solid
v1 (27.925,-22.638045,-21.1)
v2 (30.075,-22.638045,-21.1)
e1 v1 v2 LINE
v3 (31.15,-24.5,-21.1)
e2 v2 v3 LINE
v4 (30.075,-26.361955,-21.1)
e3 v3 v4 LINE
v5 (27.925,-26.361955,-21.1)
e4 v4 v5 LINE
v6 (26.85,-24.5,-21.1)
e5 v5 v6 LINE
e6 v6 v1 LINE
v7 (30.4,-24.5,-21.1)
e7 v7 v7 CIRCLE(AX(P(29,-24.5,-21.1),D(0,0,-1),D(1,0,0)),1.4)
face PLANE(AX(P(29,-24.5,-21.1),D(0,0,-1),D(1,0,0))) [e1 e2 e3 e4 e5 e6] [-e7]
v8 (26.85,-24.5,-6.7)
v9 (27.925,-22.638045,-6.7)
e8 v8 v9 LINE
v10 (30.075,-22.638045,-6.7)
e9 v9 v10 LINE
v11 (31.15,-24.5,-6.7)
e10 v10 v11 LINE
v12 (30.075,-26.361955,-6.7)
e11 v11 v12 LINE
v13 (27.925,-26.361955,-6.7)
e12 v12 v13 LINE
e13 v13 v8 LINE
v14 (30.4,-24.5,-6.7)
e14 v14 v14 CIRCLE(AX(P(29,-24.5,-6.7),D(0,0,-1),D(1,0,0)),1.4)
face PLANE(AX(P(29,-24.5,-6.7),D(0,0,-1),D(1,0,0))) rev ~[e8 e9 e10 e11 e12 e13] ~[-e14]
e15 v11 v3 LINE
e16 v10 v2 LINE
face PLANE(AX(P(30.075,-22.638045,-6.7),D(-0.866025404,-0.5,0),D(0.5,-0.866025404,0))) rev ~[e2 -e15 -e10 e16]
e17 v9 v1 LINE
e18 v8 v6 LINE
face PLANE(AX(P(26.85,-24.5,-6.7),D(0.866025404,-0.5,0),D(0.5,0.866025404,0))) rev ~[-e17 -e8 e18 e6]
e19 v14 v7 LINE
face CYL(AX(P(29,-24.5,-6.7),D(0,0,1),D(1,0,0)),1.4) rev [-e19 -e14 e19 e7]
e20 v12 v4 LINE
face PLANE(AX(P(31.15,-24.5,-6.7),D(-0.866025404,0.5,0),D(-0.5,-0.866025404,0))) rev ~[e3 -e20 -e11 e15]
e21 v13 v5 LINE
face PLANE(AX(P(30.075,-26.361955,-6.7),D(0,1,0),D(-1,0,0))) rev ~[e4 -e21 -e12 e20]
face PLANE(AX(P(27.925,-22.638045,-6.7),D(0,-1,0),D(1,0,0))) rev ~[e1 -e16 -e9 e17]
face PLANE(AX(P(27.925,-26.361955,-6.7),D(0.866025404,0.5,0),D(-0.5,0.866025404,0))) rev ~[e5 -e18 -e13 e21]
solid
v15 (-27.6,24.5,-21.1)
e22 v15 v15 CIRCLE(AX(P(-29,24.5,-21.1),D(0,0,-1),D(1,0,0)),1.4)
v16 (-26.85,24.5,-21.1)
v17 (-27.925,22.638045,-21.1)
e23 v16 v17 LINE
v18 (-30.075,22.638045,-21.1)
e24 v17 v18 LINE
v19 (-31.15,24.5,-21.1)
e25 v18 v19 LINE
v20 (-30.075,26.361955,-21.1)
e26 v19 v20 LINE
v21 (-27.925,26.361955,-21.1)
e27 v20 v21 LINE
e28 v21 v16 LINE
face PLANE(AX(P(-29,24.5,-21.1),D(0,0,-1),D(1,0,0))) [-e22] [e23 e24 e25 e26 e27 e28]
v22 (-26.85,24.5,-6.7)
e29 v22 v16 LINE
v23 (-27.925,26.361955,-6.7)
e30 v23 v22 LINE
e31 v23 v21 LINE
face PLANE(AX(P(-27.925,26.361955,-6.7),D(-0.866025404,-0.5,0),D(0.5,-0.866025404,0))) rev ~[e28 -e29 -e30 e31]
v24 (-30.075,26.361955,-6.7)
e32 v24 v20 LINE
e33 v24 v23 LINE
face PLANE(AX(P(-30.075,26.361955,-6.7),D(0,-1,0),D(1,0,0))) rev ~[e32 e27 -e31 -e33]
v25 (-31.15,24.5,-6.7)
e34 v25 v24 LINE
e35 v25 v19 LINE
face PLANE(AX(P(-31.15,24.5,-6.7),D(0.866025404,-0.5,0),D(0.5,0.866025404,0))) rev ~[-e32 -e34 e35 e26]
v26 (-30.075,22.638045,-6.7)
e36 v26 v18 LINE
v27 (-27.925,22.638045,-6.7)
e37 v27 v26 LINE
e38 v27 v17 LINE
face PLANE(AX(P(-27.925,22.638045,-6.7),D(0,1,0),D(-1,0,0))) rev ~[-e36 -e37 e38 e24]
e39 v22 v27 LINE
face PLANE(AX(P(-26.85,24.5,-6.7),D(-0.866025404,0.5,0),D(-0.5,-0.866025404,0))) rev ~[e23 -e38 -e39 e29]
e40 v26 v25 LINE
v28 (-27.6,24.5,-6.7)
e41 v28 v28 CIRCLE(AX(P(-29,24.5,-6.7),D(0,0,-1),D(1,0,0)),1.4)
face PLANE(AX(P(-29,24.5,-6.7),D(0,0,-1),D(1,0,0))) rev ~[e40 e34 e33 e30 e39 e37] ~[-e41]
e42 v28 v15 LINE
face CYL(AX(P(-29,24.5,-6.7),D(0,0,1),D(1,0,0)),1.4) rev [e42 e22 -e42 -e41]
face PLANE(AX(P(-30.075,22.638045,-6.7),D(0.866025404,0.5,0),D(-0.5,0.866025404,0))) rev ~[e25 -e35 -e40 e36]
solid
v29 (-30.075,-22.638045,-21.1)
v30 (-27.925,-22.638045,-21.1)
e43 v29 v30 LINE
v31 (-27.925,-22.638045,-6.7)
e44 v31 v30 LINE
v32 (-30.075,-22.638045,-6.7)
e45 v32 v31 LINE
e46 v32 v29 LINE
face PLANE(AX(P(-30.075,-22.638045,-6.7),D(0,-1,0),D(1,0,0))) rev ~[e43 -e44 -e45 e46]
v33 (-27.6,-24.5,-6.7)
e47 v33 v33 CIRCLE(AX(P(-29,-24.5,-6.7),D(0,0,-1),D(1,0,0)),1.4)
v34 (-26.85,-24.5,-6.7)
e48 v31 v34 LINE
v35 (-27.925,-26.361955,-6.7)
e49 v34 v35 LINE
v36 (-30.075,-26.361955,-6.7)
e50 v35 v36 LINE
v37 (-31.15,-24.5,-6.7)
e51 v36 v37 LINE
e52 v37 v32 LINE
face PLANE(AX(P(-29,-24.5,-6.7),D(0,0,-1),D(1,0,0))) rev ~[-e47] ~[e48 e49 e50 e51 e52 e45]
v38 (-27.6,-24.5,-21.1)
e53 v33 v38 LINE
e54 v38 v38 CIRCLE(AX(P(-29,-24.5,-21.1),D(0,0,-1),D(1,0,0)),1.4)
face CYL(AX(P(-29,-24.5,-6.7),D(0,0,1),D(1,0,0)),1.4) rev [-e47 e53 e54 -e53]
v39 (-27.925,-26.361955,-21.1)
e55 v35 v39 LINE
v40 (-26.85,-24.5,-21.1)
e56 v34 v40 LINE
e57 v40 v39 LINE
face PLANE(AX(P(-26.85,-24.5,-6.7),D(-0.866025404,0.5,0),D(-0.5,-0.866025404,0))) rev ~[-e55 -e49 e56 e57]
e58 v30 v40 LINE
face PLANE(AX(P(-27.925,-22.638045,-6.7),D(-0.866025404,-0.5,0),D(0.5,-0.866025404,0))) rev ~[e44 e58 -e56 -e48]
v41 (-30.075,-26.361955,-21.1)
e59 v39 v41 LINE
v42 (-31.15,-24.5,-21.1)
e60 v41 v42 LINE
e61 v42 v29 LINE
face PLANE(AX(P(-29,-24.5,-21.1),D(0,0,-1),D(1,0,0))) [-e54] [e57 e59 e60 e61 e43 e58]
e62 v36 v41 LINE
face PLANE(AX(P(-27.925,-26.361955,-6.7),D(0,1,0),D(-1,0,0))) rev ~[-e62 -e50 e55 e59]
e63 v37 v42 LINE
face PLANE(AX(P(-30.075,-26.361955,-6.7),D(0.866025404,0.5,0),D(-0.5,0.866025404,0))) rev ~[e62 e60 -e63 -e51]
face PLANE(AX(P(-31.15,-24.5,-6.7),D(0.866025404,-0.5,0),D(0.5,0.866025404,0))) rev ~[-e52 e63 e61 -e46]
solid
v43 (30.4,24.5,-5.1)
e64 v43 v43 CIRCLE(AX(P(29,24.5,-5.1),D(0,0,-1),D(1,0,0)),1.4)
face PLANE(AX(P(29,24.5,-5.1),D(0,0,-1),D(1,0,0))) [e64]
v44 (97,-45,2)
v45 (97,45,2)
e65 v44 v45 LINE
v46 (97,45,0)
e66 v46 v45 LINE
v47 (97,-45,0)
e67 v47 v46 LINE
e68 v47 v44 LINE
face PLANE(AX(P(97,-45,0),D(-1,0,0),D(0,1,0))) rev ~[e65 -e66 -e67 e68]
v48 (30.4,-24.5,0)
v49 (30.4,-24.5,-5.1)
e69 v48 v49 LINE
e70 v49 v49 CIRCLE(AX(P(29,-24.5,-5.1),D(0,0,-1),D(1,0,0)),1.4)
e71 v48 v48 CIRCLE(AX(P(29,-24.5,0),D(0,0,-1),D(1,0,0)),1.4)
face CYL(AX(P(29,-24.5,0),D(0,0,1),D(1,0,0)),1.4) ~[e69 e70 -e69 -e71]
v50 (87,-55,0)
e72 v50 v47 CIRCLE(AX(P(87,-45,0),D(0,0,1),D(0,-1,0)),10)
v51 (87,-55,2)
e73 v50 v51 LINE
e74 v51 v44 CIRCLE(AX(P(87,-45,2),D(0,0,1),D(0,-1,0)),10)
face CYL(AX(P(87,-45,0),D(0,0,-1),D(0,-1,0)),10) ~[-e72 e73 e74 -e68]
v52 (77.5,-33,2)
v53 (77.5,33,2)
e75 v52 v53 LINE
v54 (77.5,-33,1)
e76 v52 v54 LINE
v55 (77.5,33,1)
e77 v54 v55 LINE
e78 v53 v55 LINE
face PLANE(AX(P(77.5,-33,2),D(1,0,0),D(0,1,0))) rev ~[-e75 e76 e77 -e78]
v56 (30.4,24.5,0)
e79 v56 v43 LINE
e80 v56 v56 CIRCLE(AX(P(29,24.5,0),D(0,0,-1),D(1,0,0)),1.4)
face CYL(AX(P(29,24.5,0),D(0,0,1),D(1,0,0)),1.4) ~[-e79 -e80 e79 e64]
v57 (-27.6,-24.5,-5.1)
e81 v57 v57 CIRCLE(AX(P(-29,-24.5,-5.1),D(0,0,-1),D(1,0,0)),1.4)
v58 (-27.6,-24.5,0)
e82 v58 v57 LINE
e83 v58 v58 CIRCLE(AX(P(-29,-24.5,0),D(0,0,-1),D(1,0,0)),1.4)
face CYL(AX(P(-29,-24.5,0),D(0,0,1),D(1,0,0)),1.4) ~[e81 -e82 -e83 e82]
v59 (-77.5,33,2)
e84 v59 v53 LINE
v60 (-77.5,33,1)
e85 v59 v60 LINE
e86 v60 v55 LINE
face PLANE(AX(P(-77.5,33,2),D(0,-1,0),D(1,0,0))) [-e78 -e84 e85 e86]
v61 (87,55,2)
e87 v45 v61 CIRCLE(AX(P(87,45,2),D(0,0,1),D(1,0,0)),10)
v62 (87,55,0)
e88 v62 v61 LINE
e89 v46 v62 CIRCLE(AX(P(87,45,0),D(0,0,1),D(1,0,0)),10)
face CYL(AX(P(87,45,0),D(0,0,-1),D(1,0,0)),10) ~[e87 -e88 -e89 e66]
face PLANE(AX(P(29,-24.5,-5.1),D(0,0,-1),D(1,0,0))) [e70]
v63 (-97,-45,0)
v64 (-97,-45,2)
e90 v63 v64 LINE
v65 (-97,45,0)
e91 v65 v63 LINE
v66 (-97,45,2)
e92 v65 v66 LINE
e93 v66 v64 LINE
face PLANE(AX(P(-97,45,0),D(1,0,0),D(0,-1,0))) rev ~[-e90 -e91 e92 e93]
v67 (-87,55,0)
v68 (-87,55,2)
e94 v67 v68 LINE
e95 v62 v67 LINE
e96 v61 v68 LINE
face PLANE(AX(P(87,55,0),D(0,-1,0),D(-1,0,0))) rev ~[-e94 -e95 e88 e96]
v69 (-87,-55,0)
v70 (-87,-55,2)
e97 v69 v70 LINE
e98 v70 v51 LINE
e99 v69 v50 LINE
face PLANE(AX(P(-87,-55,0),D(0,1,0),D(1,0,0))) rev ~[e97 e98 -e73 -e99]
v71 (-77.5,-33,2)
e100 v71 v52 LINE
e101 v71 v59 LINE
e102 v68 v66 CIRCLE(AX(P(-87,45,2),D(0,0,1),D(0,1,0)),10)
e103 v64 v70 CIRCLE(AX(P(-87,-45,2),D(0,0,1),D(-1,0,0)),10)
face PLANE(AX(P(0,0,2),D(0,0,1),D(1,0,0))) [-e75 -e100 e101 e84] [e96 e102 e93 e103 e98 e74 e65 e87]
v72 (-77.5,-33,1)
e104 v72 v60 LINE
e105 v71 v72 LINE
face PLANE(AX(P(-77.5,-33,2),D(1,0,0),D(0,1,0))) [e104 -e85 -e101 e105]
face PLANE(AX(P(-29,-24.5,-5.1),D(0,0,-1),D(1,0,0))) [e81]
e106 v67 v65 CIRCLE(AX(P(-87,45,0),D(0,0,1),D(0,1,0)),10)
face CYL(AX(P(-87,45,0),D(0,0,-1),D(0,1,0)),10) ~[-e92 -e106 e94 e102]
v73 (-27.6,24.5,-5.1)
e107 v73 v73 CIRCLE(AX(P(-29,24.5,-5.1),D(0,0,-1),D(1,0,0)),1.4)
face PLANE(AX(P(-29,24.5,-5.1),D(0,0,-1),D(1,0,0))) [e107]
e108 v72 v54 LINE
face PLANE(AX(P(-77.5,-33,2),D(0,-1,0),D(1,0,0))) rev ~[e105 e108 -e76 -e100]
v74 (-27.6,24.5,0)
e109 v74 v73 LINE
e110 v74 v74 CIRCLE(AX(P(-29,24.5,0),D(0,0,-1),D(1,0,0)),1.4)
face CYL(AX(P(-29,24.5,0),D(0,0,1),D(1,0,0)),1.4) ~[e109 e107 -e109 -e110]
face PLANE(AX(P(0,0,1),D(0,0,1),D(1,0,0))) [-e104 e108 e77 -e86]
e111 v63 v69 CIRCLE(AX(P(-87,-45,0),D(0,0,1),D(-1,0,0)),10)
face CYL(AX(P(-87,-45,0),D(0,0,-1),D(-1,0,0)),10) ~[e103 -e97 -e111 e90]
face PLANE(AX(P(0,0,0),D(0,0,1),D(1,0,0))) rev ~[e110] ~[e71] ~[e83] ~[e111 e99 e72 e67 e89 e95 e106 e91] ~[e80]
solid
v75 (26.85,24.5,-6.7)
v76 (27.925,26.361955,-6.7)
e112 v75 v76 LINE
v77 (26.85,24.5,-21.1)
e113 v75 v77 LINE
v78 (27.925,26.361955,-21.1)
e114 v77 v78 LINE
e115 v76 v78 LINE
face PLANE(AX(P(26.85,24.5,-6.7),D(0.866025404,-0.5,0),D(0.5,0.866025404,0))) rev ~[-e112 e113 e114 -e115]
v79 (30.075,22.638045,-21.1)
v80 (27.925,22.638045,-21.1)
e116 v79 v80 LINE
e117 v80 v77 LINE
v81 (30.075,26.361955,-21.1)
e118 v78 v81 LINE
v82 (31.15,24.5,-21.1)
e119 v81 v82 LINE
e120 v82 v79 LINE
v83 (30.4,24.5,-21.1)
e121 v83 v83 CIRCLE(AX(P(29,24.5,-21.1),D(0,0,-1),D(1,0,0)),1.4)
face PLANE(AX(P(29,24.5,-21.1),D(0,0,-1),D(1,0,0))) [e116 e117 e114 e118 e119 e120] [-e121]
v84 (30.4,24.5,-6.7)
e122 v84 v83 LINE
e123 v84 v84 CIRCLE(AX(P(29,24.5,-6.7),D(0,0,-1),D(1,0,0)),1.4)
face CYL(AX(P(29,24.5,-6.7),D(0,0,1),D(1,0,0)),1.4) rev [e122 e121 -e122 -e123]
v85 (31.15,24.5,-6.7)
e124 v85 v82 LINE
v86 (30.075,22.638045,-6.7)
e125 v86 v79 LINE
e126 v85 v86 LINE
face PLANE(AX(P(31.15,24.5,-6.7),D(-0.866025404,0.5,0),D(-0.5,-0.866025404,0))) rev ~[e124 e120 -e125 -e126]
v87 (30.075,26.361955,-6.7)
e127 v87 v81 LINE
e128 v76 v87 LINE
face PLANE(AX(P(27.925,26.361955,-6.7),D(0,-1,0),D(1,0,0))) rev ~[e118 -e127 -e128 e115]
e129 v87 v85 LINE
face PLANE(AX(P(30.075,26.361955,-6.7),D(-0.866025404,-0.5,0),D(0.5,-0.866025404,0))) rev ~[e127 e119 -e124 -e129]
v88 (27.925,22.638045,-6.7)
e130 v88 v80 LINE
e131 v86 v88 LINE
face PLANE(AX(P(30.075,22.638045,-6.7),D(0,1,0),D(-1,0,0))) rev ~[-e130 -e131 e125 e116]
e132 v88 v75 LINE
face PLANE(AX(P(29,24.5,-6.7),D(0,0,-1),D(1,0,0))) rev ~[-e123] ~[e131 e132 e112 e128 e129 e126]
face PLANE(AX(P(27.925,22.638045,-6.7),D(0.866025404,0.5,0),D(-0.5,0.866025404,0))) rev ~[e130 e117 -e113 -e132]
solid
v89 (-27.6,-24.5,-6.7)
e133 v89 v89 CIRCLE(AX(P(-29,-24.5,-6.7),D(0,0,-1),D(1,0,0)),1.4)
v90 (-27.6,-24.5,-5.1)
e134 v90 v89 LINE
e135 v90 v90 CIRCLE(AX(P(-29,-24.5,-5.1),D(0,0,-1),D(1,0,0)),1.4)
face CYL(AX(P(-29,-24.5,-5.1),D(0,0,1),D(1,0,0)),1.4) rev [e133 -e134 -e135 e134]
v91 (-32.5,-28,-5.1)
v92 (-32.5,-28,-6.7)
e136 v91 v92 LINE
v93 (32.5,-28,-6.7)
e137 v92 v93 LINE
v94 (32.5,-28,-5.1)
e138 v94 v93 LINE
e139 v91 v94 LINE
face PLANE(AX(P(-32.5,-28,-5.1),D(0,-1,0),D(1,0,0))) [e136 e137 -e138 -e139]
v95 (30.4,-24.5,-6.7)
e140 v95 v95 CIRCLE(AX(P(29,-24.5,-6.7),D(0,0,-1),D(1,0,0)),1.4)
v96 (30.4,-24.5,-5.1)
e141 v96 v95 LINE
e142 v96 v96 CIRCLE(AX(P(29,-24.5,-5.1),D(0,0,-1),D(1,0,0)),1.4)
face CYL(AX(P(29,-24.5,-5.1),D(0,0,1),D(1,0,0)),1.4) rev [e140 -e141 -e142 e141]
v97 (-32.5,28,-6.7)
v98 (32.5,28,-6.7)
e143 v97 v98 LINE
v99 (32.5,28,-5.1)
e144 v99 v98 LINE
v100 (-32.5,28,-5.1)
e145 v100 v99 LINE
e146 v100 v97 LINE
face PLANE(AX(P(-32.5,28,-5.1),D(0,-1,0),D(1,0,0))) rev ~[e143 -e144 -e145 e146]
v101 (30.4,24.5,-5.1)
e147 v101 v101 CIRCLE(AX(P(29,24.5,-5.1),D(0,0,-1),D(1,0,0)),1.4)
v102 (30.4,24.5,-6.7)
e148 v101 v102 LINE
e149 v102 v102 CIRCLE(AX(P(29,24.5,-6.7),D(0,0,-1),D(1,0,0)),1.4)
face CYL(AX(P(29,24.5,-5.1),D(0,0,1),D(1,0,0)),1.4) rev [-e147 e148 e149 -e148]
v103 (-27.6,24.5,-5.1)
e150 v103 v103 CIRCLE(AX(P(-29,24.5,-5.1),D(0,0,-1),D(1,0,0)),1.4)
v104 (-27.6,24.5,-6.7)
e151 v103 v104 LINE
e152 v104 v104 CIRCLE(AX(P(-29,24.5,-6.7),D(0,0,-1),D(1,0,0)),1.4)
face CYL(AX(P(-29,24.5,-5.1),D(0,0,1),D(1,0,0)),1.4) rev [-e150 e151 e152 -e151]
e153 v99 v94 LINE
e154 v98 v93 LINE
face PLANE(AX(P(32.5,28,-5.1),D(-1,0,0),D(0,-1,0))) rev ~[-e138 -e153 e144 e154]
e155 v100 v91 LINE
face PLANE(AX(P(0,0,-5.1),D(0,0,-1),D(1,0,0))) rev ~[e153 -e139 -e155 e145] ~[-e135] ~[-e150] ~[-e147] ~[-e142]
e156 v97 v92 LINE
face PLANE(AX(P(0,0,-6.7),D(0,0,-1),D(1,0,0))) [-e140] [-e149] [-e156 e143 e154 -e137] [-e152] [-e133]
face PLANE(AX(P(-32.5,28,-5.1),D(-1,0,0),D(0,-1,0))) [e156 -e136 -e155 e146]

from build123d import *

# Parameters (mm, degrees)
F1_DEPTH = 2
F2_W     = 155
F2_H     = 66
F3_DEPTH = 1
F4_R     = 1.4
F5_DEPTH = 5.1
F6_W     = 65
F6_H     = 56
F6_R     = 1.4
F7_DEPTH = 1.6
F8_R     = 1.4
F9_DEPTH = 14.4


with BuildPart() as f1:
    # F0 (on Top) → F1 (new body)
    with BuildSketch(Plane.XY):
        with BuildLine():
            Line((87, 55), (-87, 55))
            ThreePointArc((-87, 55), (-94.0710678119, 52.0710678119), (-97, 45))
            Line((-97, 45), (-97, -45))
            ThreePointArc((-97, -45), (-94.0710678119, -52.0710678119), (-87, -55))
            Line((-87, -55), (87, -55))
            ThreePointArc((87, -55), (94.0710678119, -52.0710678119), (97, -45))
            Line((97, -45), (97, 45))
            ThreePointArc((97, 45), (94.0710678119, 52.0710678119), (87, 55))
        make_face()
    extrude(amount=F1_DEPTH)

    # F2 (on face) → F3 (cut)
    with BuildSketch(Plane.XY.offset(2)):
        Rectangle(F2_W, F2_H)
    extrude(amount=-F3_DEPTH, mode=Mode.SUBTRACT)

    # F4 (on face) → F5 (join)
    with BuildSketch(Plane(origin=(0, 0, 0), x_dir=(1, 0, 0), z_dir=(0, 0, -1))):
        with Locations((-29, 24.5)):
            Circle(F4_R)
        with Locations((-29, -24.5)):
            Circle(F4_R)
        with Locations((29, -24.5)):
            Circle(F4_R)
        with Locations((29, 24.5)):
            Circle(F4_R)
    extrude(amount=F5_DEPTH)


with BuildPart() as f7:
    # F6 (on face) → F7 (new body)
    with BuildSketch(Plane(origin=(0, 0, -5.1), x_dir=(1, 0, 0), z_dir=(0, 0, -1))):
        Rectangle(F6_W, F6_H)
        with Locations((-29, -24.5)):
            Circle(F6_R, mode=Mode.SUBTRACT)
        with Locations((29, -24.5)):
            Circle(F6_R, mode=Mode.SUBTRACT)
        with Locations((-29, 24.5)):
            Circle(F6_R, mode=Mode.SUBTRACT)
        with Locations((29, 24.5)):
            Circle(F6_R, mode=Mode.SUBTRACT)
    extrude(amount=F7_DEPTH)


with BuildPart() as f9:
    # F8 (on face) → F9 (new body)
    with BuildSketch(Plane(origin=(0, 0, -6.7), x_dir=(1, 0, 0), z_dir=(0, 0, -1))):
        Polygon((-27.925, 22.6380453819), (-26.85, 24.5), (-27.925, 26.3619546181), (-30.075, 26.3619546181), (-31.15, 24.5), (-30.075, 22.6380453819), align=None)
        with Locations((-29, 24.5)):
            Circle(F8_R, mode=Mode.SUBTRACT)
    extrude(amount=F9_DEPTH)


with BuildPart() as f9b:
    # F8 (on face) → F9, piece 2 (new body)
    with BuildSketch(Plane(origin=(0, 0, -6.7), x_dir=(1, 0, 0), z_dir=(0, 0, -1))):
        Polygon((27.925, 26.3619546181), (26.85, 24.5), (27.925, 22.6380453819), (30.075, 22.6380453819), (31.15, 24.5), (30.075, 26.3619546181), align=None)
        with Locations((29, 24.5)):
            Circle(F8_R, mode=Mode.SUBTRACT)
    extrude(amount=F9_DEPTH)


with BuildPart() as f9c:
    # F8 (on face) → F9, piece 3 (new body)
    with BuildSketch(Plane(origin=(0, 0, -6.7), x_dir=(1, 0, 0), z_dir=(0, 0, -1))):
        Polygon((27.925, -22.6380453819), (26.85, -24.5), (27.925, -26.3619546181), (30.075, -26.3619546181), (31.15, -24.5), (30.075, -22.6380453819), align=None)
        with Locations((29, -24.5)):
            Circle(F8_R, mode=Mode.SUBTRACT)
    extrude(amount=F9_DEPTH)


with BuildPart() as f9d:
    # F8 (on face) → F9, piece 4 (new body)
    with BuildSketch(Plane(origin=(0, 0, -6.7), x_dir=(1, 0, 0), z_dir=(0, 0, -1))):
        Polygon((-27.925, -26.3619546181), (-26.85, -24.5), (-27.925, -22.6380453819), (-30.075, -22.6380453819), (-31.15, -24.5), (-30.075, -26.3619546181), align=None)
        with Locations((-29, -24.5)):
            Circle(F8_R, mode=Mode.SUBTRACT)
    extrude(amount=F9_DEPTH)


solid = Compound([f1.part, f7.part, f9.part, f9b.part, f9c.part, f9d.part])
